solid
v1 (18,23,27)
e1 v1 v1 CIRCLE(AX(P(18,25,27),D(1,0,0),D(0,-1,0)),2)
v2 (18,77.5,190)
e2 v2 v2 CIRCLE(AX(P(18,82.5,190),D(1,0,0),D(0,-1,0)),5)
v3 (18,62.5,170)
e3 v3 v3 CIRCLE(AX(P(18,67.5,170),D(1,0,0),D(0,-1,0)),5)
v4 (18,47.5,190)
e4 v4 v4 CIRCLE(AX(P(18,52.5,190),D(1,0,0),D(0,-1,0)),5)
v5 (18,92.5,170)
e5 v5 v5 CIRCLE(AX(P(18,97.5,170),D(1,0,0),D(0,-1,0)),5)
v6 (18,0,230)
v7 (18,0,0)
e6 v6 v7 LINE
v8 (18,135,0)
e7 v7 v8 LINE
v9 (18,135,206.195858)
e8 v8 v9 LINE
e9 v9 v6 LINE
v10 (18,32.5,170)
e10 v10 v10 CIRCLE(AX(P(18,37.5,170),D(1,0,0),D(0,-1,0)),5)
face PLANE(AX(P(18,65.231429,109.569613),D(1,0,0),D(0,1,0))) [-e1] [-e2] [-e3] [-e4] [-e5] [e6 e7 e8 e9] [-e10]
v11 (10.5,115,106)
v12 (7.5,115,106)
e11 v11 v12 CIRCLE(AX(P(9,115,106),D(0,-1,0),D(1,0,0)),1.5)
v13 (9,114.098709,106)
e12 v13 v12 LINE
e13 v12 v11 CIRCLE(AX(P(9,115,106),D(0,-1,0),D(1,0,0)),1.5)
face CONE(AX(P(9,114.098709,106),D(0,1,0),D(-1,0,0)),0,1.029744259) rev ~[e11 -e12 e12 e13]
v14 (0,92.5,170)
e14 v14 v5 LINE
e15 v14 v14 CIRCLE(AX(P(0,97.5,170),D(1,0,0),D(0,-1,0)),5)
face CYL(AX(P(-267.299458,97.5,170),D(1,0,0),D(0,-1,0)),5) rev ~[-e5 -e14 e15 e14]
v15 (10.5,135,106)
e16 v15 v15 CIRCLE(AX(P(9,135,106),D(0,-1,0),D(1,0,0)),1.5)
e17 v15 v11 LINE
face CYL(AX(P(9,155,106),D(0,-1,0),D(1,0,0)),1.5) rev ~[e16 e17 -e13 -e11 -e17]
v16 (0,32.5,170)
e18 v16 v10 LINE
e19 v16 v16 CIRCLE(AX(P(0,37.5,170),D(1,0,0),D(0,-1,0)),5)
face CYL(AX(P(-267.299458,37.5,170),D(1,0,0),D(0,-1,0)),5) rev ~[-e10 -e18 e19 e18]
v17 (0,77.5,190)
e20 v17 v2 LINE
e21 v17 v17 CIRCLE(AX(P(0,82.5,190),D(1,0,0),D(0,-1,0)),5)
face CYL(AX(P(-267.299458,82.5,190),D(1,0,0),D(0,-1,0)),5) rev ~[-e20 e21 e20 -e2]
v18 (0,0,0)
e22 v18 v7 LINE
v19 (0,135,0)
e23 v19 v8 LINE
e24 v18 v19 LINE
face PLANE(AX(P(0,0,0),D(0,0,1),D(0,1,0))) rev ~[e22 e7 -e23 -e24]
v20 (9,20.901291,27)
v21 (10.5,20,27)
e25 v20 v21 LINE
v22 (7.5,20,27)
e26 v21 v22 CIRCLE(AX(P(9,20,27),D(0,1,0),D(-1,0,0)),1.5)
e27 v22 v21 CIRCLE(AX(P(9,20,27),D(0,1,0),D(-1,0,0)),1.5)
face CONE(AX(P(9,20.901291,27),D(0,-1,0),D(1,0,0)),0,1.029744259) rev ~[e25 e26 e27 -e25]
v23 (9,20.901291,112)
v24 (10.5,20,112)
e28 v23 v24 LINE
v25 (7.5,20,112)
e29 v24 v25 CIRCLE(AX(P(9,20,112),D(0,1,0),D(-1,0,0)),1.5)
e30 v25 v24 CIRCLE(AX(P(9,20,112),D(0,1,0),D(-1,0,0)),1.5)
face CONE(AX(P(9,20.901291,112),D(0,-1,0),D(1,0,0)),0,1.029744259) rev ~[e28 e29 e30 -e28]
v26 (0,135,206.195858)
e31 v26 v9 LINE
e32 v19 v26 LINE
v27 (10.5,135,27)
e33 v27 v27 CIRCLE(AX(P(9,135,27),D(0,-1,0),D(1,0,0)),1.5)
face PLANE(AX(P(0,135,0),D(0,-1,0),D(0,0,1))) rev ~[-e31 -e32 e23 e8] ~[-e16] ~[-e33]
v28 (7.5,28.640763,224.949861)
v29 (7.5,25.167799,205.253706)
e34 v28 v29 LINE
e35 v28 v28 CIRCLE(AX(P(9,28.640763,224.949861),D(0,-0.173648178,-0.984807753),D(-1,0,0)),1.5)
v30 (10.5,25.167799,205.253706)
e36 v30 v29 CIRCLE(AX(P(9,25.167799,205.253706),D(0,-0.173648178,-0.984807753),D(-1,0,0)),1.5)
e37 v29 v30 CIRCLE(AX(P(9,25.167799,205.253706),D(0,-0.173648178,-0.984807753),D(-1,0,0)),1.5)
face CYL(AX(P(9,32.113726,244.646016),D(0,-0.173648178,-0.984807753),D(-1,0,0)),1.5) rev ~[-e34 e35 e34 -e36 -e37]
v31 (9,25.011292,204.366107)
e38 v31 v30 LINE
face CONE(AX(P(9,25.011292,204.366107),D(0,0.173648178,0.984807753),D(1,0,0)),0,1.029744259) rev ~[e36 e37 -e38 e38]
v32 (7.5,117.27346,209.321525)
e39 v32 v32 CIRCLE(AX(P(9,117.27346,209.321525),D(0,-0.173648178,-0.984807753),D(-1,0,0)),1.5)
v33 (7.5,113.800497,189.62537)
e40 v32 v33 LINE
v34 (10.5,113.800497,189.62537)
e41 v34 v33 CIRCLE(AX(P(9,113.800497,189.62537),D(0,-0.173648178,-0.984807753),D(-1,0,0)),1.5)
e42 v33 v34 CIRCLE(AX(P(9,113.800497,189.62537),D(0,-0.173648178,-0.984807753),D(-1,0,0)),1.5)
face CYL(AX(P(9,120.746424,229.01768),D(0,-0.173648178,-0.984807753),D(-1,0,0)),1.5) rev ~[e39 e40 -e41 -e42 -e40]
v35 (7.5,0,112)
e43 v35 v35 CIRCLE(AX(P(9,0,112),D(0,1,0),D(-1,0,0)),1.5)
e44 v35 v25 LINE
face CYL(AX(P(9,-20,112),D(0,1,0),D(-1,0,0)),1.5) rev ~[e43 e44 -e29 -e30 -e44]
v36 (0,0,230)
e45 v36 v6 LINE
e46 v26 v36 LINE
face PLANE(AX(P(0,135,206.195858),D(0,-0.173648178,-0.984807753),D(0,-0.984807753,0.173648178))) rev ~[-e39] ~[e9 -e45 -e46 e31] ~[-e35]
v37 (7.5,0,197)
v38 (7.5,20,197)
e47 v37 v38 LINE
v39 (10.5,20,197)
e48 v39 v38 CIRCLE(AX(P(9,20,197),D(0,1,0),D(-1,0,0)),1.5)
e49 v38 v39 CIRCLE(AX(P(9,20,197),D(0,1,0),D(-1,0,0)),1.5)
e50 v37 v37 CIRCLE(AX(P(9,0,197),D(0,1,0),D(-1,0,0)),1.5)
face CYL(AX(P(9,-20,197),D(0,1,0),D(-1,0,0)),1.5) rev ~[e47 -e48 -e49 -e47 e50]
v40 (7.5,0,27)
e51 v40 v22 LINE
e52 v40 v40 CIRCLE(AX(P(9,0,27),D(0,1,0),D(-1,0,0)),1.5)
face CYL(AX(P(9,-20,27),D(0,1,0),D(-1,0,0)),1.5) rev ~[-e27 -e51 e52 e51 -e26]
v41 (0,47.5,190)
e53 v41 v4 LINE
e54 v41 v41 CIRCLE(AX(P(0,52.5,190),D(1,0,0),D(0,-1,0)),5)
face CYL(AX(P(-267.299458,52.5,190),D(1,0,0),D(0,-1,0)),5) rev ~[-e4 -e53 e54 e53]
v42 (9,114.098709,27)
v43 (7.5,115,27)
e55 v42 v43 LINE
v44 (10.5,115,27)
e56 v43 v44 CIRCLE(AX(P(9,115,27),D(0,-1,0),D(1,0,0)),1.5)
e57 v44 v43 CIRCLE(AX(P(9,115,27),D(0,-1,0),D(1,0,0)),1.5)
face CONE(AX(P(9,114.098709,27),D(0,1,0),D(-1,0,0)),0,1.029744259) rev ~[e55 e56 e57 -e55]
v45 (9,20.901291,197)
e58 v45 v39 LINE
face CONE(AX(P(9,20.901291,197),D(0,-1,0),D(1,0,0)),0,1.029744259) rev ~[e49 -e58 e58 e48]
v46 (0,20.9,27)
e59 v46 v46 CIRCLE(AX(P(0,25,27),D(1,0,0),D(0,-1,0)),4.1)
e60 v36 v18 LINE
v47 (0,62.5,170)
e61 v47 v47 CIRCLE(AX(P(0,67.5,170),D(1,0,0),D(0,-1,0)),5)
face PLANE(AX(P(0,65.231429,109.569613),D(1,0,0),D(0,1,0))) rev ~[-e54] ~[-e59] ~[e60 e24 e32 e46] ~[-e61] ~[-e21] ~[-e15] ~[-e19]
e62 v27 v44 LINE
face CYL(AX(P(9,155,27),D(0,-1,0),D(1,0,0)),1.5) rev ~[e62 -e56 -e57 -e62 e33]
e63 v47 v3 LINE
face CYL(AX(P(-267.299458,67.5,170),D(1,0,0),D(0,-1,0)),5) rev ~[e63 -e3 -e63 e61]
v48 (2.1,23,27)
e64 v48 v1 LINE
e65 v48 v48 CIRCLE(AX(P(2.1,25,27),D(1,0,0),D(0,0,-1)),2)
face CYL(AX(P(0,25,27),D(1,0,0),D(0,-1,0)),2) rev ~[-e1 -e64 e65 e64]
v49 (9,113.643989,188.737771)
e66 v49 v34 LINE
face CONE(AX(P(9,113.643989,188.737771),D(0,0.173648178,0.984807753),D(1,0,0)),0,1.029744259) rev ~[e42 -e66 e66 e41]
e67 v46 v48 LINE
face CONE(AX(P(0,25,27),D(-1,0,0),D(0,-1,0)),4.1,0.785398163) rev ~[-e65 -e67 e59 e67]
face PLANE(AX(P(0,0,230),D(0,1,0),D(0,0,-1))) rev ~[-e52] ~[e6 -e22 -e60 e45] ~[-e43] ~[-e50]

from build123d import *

# Parameters (mm, degrees)
F1_DEPTH       = 18
F2_D           = 10
F3_D           = 10
F4_D           = 4
F4_CSINK_D     = 8.2
F4_CSINK_ANGLE = 90
F6_D           = 3
F6_DEPTH       = 20
F6_TIP         = 0.9012909285
F8_D           = 3
F8_DEPTH       = 20
F8_TIP         = 0.9012909285
F10_D          = 3
F10_DEPTH      = 20
F10_TIP        = 0.9012909285


# Not quite as in the source:
# - a feature names something its author has since deleted; it is built from what else it names


with BuildPart() as f1:
    # F0 (on Right) → F1 (new body)
    with BuildSketch(Plane.YZ):
        Polygon((0, 230), (0, 0), (135, 0), (135, 206.1958576044), align=None)
    extrude(amount=F1_DEPTH)

    # F2 (through all)
    with Locations(Plane(origin=(0, 0, 0), x_dir=(0, 1, 0), z_dir=(-1, 0, 0))):
        with Locations((37.5, -170), (67.5, -170), (97.5, -170)):
            Hole(F2_D / 2)

    # F3 (through all)
    with Locations(Plane(origin=(0, 0, 0), x_dir=(0, 1, 0), z_dir=(-1, 0, 0))):
        with Locations((52.5, -190), (82.5, -190)):
            Hole(F3_D / 2)

    # F4 (through all)
    with Locations(Plane(origin=(0, 0, 0), x_dir=(0, 1, 0), z_dir=(-1, 0, 0))):
        with Locations((25, -27)):
            CounterSinkHole(F4_D / 2, F4_CSINK_D / 2, counter_sink_angle=F4_CSINK_ANGLE)

    # F6
    with Locations(Plane(origin=(0, 135, 0), x_dir=(-1, 0, 0), z_dir=(0, 1, 0))):
        with Locations((-9, 27), (-9, 106)):
            Hole(F6_D / 2, depth=F6_DEPTH)
            with Locations((0, 0, -(F6_DEPTH + F6_TIP / 2))):  # 118° drill point
                Cone(0, F6_D / 2, F6_TIP, mode=Mode.SUBTRACT)

    # F8
    with Locations(Plane.XZ):
        with Locations((9, 27), (9, 112), (9, 197)):
            Hole(F8_D / 2, depth=F8_DEPTH)
            with Locations((0, 0, -(F8_DEPTH + F8_TIP / 2))):  # 118° drill point
                Cone(0, F8_D / 2, F8_TIP, mode=Mode.SUBTRACT)

    # F10
    with Locations(Plane(origin=(0, 39.3323164825, 223.0646513904), x_dir=(1, 0, 0), z_dir=(0, 0.1736481777, 0.984807753))):
        with Locations((9, -10.8564882588), (9, 79.1435117412)):
            Hole(F10_D / 2, depth=F10_DEPTH)
            with Locations((0, 0, -(F10_DEPTH + F10_TIP / 2))):  # 118° drill point
                Cone(0, F10_D / 2, F10_TIP, mode=Mode.SUBTRACT)


solid = f1.part
